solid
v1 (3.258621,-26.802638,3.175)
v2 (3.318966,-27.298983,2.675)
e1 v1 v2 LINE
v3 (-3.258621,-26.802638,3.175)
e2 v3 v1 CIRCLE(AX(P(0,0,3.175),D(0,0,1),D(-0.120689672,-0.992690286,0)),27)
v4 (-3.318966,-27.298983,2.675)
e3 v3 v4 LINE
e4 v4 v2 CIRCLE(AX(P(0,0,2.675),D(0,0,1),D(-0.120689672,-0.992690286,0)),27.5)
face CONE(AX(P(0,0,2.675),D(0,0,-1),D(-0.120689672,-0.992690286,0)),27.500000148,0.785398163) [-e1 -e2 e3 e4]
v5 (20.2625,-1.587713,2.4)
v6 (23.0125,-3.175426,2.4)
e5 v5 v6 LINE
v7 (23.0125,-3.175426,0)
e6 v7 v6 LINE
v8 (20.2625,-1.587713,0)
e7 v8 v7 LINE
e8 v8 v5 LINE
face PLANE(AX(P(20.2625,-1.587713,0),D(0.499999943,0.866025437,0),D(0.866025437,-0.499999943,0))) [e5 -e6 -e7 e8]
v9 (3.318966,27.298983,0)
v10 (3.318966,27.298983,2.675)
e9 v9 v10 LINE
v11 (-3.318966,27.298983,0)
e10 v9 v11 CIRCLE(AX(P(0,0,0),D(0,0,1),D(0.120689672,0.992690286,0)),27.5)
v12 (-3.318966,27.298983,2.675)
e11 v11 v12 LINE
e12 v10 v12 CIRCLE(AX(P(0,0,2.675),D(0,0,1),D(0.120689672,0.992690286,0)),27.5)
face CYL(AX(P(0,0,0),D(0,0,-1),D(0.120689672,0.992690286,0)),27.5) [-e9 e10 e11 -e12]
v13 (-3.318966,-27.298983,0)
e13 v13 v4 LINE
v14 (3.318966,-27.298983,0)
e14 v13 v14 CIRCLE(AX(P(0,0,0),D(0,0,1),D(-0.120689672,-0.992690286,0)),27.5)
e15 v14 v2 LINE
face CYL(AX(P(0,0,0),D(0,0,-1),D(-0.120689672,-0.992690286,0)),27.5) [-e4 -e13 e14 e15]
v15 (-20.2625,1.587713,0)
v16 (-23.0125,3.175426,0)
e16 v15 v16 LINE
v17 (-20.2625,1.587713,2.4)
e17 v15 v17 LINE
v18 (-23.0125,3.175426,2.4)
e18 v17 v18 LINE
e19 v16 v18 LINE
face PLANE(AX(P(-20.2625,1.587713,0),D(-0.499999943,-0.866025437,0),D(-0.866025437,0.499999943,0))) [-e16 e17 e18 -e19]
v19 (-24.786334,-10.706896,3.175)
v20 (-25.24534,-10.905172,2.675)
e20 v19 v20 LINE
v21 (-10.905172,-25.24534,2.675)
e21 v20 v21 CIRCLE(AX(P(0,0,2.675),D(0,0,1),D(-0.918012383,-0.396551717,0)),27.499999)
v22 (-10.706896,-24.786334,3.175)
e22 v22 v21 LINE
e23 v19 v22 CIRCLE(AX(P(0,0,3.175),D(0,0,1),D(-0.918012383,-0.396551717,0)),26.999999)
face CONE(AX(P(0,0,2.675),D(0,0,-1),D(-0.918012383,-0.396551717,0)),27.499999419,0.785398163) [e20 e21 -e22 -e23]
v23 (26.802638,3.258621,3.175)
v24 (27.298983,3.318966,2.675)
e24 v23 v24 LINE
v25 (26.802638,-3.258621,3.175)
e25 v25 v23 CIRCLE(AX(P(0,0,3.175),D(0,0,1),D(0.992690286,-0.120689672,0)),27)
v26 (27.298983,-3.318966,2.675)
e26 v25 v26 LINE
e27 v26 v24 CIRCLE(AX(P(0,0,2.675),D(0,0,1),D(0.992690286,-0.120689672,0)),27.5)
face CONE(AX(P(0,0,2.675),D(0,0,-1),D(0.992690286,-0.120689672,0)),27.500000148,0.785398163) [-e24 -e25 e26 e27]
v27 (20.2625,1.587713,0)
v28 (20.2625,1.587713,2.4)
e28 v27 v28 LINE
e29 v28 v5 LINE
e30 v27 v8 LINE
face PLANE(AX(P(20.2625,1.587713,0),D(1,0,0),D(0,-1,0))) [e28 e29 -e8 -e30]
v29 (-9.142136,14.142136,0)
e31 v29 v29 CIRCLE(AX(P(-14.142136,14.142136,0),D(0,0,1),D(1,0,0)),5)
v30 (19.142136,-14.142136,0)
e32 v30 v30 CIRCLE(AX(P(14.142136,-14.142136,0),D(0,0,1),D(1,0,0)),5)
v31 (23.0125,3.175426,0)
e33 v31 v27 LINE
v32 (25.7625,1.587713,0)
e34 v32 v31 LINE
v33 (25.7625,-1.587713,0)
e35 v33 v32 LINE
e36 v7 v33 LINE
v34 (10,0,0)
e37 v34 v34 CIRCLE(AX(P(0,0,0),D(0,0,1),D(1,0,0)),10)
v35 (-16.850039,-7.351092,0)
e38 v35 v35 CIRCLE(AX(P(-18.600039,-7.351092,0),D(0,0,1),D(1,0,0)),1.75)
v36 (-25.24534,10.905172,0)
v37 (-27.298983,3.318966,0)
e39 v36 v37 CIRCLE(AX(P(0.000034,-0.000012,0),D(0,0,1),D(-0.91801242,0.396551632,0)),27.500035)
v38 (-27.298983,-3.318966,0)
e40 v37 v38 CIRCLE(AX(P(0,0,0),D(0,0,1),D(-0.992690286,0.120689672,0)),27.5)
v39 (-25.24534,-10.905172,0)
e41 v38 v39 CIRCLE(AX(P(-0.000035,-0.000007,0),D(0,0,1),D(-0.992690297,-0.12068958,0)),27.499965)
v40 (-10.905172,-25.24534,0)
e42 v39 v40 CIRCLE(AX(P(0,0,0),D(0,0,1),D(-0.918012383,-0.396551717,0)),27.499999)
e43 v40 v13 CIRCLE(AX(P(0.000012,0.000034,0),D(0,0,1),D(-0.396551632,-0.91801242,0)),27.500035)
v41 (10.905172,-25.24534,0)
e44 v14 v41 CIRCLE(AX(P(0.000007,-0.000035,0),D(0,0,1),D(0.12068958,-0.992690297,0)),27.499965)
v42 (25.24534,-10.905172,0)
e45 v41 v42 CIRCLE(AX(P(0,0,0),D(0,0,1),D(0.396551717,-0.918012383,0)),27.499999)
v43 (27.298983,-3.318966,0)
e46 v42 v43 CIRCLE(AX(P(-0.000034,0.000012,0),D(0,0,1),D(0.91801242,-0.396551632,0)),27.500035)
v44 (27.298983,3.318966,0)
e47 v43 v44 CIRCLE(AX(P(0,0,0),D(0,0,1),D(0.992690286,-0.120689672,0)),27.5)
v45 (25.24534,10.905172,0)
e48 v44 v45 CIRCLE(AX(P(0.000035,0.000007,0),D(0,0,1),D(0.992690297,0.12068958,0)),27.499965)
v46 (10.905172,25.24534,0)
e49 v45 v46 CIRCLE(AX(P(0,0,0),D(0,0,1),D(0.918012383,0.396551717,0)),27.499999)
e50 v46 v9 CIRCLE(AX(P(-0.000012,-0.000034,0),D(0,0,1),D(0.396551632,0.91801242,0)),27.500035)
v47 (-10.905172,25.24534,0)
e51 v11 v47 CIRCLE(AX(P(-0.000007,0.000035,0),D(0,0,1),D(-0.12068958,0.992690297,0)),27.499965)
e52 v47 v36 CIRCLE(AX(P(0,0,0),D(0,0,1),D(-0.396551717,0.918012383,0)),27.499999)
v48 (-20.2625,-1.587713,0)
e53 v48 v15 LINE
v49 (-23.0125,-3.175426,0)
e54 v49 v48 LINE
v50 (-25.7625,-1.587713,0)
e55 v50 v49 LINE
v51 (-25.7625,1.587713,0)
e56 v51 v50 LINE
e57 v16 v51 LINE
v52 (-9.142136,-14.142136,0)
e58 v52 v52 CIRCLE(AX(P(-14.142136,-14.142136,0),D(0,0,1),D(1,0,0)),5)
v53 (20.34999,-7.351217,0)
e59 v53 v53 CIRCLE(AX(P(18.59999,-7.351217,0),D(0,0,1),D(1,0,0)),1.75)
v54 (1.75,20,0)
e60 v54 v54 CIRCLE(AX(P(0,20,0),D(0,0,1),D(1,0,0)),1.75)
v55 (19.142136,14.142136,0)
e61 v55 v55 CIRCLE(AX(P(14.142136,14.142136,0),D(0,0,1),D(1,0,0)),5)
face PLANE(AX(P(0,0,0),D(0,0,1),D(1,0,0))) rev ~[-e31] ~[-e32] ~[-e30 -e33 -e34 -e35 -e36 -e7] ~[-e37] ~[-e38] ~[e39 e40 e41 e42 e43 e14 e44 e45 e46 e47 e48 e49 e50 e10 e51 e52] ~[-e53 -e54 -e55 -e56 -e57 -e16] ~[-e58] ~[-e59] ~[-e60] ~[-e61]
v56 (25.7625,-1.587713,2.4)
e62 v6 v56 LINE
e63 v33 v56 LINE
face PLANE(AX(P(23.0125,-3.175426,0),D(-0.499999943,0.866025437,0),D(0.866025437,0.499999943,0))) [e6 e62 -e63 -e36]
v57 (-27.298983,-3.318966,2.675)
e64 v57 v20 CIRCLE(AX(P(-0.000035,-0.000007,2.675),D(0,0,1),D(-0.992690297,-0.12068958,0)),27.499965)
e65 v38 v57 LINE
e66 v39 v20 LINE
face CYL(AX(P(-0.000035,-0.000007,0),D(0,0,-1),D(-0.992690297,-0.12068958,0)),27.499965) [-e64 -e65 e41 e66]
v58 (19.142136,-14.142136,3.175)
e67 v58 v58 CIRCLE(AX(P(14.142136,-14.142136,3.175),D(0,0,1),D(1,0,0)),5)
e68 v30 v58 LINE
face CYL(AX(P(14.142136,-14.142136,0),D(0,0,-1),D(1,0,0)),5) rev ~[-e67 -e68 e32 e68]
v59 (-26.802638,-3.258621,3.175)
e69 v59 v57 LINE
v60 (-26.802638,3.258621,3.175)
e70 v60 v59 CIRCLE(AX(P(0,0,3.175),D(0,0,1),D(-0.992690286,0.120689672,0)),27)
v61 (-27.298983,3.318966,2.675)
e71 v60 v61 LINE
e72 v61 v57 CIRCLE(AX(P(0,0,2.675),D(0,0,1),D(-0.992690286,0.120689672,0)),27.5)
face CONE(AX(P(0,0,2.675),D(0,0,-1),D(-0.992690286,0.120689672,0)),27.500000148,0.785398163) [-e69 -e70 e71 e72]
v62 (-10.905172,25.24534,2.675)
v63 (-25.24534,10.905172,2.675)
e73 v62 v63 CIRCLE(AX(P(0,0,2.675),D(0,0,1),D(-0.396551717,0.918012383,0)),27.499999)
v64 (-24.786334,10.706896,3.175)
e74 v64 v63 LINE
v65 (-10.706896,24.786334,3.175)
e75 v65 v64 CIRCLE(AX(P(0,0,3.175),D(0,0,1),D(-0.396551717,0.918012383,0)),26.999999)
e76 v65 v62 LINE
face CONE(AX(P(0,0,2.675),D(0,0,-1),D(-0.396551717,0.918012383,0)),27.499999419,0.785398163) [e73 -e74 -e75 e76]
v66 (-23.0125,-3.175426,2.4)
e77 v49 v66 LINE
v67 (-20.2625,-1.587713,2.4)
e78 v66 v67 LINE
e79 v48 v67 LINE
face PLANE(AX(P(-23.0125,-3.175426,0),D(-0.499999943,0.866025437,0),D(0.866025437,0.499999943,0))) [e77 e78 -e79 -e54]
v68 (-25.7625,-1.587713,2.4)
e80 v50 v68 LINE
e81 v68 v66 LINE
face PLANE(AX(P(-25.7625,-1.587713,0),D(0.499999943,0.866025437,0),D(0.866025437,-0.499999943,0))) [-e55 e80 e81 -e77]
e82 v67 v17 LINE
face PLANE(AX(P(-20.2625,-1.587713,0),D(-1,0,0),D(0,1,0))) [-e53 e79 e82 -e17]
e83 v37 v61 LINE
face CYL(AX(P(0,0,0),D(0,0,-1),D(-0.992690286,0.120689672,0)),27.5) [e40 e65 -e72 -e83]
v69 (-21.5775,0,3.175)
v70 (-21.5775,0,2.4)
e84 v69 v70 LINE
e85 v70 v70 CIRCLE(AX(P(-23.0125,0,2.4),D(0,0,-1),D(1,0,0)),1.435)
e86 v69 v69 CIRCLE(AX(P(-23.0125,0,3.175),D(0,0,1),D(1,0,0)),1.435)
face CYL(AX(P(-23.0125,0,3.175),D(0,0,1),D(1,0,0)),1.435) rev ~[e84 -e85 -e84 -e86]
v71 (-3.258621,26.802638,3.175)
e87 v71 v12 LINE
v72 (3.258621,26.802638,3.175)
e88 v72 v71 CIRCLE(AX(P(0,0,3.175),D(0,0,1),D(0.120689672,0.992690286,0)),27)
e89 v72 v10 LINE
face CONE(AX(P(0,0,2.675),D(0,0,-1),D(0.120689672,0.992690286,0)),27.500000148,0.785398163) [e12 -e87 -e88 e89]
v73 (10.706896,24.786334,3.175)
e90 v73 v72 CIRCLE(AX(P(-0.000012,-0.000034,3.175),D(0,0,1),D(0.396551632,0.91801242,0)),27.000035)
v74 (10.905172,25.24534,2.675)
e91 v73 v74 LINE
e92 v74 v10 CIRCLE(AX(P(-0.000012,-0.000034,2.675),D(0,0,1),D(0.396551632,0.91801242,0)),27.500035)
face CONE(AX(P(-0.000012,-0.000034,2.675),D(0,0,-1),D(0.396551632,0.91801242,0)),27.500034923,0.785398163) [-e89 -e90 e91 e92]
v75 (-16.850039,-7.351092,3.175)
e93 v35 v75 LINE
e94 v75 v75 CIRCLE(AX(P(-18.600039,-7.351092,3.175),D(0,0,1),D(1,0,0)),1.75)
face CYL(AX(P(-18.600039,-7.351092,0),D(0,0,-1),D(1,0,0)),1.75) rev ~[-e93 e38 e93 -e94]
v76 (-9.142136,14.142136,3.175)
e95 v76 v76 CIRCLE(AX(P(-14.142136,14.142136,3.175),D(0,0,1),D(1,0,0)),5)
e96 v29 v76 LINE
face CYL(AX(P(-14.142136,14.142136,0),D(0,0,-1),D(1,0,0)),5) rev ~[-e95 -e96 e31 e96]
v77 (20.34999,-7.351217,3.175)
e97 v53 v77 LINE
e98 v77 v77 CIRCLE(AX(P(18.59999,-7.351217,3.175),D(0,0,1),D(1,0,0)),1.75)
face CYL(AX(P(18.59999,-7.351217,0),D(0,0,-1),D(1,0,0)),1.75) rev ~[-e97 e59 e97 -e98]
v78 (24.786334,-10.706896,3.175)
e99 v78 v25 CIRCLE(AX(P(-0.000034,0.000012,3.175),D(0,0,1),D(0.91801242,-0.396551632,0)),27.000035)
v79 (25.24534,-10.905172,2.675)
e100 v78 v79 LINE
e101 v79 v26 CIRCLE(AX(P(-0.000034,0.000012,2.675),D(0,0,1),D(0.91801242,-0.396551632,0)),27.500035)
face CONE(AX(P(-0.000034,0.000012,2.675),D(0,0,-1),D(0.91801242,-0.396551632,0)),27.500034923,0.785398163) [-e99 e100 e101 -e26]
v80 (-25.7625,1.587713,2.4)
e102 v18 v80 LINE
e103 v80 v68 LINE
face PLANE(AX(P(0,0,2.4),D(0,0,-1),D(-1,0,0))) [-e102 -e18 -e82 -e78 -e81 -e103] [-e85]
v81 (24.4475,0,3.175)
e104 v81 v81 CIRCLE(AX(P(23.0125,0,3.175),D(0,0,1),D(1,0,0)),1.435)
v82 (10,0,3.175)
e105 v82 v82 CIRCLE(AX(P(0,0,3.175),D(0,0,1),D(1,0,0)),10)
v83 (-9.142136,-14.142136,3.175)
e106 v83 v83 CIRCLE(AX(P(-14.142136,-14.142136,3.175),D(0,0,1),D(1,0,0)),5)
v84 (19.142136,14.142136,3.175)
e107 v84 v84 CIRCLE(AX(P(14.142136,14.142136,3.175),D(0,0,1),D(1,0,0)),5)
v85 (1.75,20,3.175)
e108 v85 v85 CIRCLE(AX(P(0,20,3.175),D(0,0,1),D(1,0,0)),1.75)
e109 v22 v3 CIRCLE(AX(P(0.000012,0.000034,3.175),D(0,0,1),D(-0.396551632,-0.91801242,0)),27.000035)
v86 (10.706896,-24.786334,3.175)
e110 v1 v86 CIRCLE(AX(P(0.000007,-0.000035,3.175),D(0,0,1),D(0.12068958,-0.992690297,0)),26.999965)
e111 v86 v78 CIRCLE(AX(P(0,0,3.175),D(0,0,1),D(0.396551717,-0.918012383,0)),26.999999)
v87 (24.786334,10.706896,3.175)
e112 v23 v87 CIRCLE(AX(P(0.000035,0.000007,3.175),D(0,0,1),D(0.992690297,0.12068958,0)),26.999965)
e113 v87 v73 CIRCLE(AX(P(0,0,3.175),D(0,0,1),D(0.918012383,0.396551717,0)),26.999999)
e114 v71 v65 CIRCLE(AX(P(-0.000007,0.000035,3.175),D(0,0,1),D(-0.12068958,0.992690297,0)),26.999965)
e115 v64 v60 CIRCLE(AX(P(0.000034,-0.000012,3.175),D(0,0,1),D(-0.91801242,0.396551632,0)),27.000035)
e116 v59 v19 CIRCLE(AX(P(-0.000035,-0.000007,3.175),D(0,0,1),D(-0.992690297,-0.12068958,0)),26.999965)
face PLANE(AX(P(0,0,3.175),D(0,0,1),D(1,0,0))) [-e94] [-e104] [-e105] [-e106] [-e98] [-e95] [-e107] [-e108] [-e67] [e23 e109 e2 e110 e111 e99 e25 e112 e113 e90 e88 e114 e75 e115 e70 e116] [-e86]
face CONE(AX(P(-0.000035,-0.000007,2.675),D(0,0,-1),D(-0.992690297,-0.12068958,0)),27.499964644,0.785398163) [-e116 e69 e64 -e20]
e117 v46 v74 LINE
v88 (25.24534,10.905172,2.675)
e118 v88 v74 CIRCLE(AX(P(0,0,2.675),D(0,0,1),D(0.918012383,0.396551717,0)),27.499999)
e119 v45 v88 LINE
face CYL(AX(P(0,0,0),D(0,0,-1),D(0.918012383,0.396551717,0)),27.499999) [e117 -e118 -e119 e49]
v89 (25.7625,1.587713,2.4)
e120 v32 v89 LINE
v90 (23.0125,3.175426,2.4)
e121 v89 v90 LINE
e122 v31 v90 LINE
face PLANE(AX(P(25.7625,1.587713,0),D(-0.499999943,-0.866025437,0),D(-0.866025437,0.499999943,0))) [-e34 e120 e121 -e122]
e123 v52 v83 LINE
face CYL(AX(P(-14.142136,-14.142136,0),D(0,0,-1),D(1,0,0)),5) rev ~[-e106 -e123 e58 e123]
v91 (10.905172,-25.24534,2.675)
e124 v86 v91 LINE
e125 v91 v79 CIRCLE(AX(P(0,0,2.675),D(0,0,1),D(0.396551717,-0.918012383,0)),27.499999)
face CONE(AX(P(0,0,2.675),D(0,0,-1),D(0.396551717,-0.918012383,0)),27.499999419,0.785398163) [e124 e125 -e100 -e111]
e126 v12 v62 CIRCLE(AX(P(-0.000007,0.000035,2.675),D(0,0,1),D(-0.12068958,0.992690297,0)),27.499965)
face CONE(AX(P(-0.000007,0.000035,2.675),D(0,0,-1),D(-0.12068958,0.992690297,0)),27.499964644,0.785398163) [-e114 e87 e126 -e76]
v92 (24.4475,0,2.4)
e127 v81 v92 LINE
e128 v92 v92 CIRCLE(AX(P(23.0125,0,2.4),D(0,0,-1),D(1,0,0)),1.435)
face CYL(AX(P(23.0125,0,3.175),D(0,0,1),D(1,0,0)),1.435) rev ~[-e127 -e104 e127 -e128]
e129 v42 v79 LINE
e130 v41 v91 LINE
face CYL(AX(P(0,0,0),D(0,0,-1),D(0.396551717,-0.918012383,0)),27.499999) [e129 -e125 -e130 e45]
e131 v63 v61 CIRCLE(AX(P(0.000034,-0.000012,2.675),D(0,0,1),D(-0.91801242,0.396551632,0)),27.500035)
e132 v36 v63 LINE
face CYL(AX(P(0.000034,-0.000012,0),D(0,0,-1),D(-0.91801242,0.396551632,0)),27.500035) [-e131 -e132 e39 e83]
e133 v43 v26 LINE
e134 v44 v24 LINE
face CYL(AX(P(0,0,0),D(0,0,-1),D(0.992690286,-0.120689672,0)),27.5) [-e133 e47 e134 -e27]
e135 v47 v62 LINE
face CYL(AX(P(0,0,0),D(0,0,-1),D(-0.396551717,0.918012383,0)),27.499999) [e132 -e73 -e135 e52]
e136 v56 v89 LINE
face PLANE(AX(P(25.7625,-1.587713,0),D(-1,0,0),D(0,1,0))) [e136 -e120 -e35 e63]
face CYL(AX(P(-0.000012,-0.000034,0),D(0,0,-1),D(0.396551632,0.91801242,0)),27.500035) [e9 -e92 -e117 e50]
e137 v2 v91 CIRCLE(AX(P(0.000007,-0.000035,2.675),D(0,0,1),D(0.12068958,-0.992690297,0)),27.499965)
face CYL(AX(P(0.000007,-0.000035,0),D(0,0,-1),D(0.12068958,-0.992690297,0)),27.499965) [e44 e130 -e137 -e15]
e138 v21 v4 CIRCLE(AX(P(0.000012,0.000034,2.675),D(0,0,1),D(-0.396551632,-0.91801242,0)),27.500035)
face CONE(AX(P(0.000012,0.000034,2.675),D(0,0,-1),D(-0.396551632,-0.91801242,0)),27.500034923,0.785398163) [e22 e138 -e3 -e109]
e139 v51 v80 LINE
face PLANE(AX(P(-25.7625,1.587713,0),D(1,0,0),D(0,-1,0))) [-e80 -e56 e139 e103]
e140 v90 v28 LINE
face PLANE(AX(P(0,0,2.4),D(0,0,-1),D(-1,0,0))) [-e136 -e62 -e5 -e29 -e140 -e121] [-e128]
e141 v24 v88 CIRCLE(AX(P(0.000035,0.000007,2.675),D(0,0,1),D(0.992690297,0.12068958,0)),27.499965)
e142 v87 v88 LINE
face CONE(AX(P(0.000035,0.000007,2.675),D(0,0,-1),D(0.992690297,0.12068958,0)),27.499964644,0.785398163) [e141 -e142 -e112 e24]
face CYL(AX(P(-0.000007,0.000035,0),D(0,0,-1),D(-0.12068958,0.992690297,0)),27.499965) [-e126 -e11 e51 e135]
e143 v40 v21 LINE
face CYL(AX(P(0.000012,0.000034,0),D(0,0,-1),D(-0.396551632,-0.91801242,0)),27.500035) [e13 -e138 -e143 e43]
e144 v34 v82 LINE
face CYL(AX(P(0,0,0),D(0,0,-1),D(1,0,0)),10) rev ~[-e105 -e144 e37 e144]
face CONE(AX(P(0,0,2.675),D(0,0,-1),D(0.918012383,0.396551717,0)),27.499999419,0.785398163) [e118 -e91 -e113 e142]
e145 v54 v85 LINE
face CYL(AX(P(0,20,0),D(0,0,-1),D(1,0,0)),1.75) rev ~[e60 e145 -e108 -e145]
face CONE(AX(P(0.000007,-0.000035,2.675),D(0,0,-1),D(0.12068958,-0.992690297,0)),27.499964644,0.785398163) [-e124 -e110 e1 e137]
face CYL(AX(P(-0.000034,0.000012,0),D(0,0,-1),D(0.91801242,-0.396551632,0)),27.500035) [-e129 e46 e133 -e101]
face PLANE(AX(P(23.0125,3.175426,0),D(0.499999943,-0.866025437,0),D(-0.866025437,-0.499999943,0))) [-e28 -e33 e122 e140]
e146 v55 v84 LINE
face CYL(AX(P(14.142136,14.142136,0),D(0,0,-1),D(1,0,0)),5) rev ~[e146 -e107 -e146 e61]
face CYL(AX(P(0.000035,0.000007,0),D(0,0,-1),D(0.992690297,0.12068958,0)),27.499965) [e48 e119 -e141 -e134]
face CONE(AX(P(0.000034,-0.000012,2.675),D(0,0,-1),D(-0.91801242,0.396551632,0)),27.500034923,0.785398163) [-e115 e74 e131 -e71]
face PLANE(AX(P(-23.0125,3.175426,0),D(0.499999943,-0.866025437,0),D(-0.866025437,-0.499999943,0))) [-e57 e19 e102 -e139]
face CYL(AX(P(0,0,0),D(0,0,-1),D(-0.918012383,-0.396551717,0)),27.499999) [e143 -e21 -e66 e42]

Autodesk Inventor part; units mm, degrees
ref_plane "YZ Plane" through (0, 0, 0) normal (1, 0, 0) x (0, 1, 0)
ref_plane "XZ Plane" through (0, 0, 0) normal (0, 1, 0) x (-1, 0, 0)
ref_plane "XY Plane" through (0, 0, 0) normal (0, 0, 1) x (1, 0, 0)
sketch "Sketch1" plane through (0, 0, 0) normal (0, 0, 1) x (1, 0, 0)
  circle A0 centre (-43.950789, -25.375) radius 1.8
  circle A1 centre (0, -50.75) radius 1.8
  circle A2 centre (43.950789, -25.375) radius 1.8
  circle A3 centre (43.950789, 25.375) radius 1.8
  circle A4 centre (0, 50.75) radius 1.8
  circle A5 centre (-43.950789, 25.375) radius 1.8
  circle A6 centre (0, 0) radius 55
  circle A7 centre (0, 0) radius 10
  line L0 (-5, -45.365185) -> (-5, -28.788018)
  arc A8 (-3.318966, -27.298983) -> (-5, -28.788018) centre (-3.5, -28.788018) ccw
  arc A9 (-3.318966, -27.298983) -> (3.318966, -27.298983) centre (0, 0) ccw
  arc A10 (5, -28.788018) -> (3.318966, -27.298983) centre (3.5, -28.788018) ccw
  line L1 (5, -28.788018) -> (5, -45.365185)
  arc A11 (3.615385, -46.86074) -> (5, -45.365185) centre (3.5, -45.365185) ccw
  arc A12 (-3.615385, -46.86074) -> (3.615385, -46.86074) centre (0, 0) ccw
  arc A13 (-5, -45.365185) -> (-3.615385, -46.86074) centre (-3.5, -45.365185) ccw
  arc A14 (3.615385, 46.86074) -> (-3.615385, 46.86074) centre (0, 0) ccw
  arc A15 (5, 45.365185) -> (3.615385, 46.86074) centre (3.5, 45.365185) ccw
  line L2 (5, 45.365185) -> (5, 28.788018)
  arc A16 (3.318966, 27.298983) -> (5, 28.788018) centre (3.5, 28.788018) ccw
  arc A17 (3.318966, 27.298983) -> (-3.318966, 27.298983) centre (0, 0) ccw
  arc A18 (-5, 28.788018) -> (-3.318966, 27.298983) centre (-3.5, 28.788018) ccw
  line L3 (-5, 28.788018) -> (-5, 45.365185)
  arc A19 (-3.615385, 46.86074) -> (-5, 45.365185) centre (-3.5, 45.365185) ccw
  circle A20 centre (25.375, -43.950789) radius 3.75
  arc A21 (11.879121, -45.47402) -> (23.5, -40.703194) centre (0, 0) ccw
  arc A22 (10, -44.022721) -> (11.879121, -45.47402) centre (11.5, -44.022721) ccw
  line L4 (10, -44.022721) -> (10, -26.622359)
  arc A23 (10.905172, -25.24534) -> (10, -26.622359) centre (11.5, -26.622359) ccw
  arc A24 (10.905172, -25.24534) -> (25.24534, -10.905172) centre (0, 0) ccw
  arc A25 (26.622359, -10) -> (25.24534, -10.905172) centre (26.622359, -11.5) ccw
  line L5 (26.622359, -10) -> (44.022721, -10)
  arc A26 (45.47402, -11.879121) -> (44.022721, -10) centre (44.022721, -11.5) ccw
  arc A27 (23.5, -40.703194) -> (45.47402, -11.879121) centre (0, 0) ccw
  circle A28 centre (-50.75, 0) radius 3.75
  arc A29 (-46.86074, 3.615385) -> (-47, 0) centre (0, 0) ccw
  arc A30 (-45.365185, 5) -> (-46.86074, 3.615385) centre (-45.365185, 3.5) ccw
  line L6 (-45.365185, 5) -> (-28.788018, 5)
  arc A31 (-27.298983, 3.318966) -> (-28.788018, 5) centre (-28.788018, 3.5) ccw
  arc A32 (-27.298983, 3.318966) -> (-27.298983, -3.318966) centre (0, 0) ccw
  arc A33 (-28.788018, -5) -> (-27.298983, -3.318966) centre (-28.788018, -3.5) ccw
  line L7 (-28.788018, -5) -> (-45.365185, -5)
  arc A34 (-46.86074, -3.615385) -> (-45.365185, -5) centre (-45.365185, -3.5) ccw
  arc A35 (-47, 0) -> (-46.86074, -3.615385) centre (0, 0) ccw
  circle A36 centre (25.375, 43.950789) radius 3.75
  arc A37 (45.47402, 11.879121) -> (23.5, 40.703194) centre (0, 0) ccw
  arc A38 (44.022721, 10) -> (45.47402, 11.879121) centre (44.022721, 11.5) ccw
  line L8 (44.022721, 10) -> (26.622359, 10)
  arc A39 (25.24534, 10.905172) -> (26.622359, 10) centre (26.622359, 11.5) ccw
  arc A40 (25.24534, 10.905172) -> (10.905172, 25.24534) centre (0, 0) ccw
  arc A41 (10, 26.622359) -> (10.905172, 25.24534) centre (11.5, 26.622359) ccw
  line L9 (10, 26.622359) -> (10, 44.022721)
  arc A42 (11.879121, 45.47402) -> (10, 44.022721) centre (11.5, 44.022721) ccw
  arc A43 (23.5, 40.703194) -> (11.879121, 45.47402) centre (0, 0) ccw
  circle A44 centre (-25.375, 43.950789) radius 3.75
  arc A45 (-11.879121, 45.47402) -> (-23.5, 40.703194) centre (0, 0) ccw
  arc A46 (-10, 44.022721) -> (-11.879121, 45.47402) centre (-11.5, 44.022721) ccw
  line L10 (-10, 44.022721) -> (-10, 26.622359)
  arc A47 (-10.905172, 25.24534) -> (-10, 26.622359) centre (-11.5, 26.622359) ccw
  arc A48 (-10.905172, 25.24534) -> (-25.24534, 10.905172) centre (0, 0) ccw
  arc A49 (-26.622359, 10) -> (-25.24534, 10.905172) centre (-26.622359, 11.5) ccw
  line L11 (-26.622359, 10) -> (-44.022721, 10)
  arc A50 (-45.47402, 11.879121) -> (-44.022721, 10) centre (-44.022721, 11.5) ccw
  arc A51 (-23.5, 40.703194) -> (-45.47402, 11.879121) centre (0, 0) ccw
  circle A52 centre (-25.375, -43.950789) radius 3.75
  arc A53 (-45.47402, -11.879121) -> (-23.5, -40.703194) centre (0, 0) ccw
  arc A54 (-44.022721, -10) -> (-45.47402, -11.879121) centre (-44.022721, -11.5) ccw
  line L12 (-44.022721, -10) -> (-26.622359, -10)
  arc A55 (-25.24534, -10.905172) -> (-26.622359, -10) centre (-26.622359, -11.5) ccw
  arc A56 (-25.24534, -10.905172) -> (-10.905172, -25.24534) centre (0, 0) ccw
  arc A57 (-10, -26.622359) -> (-10.905172, -25.24534) centre (-11.5, -26.622359) ccw
  line L13 (-10, -26.622359) -> (-10, -44.022721)
  arc A58 (-11.879121, -45.47402) -> (-10, -44.022721) centre (-11.5, -44.022721) ccw
  arc A59 (-23.5, -40.703194) -> (-11.879121, -45.47402) centre (0, 0) ccw
  circle A60 centre (50.75, 0) radius 3.75
  arc A61 (46.86074, -3.615385) -> (47, 0) centre (0, 0) ccw
  arc A62 (45.365185, -5) -> (46.86074, -3.615385) centre (45.365185, -3.5) ccw
  line L14 (45.365185, -5) -> (28.788018, -5)
  arc A63 (27.298983, -3.318966) -> (28.788018, -5) centre (28.788018, -3.5) ccw
  arc A64 (27.298983, -3.318966) -> (27.298983, 3.318966) centre (0, 0) ccw
  arc A65 (28.788018, 5) -> (27.298983, 3.318966) centre (28.788018, 3.5) ccw
  line L15 (28.788018, 5) -> (45.365185, 5)
  arc A66 (46.86074, 3.615385) -> (45.365185, 5) centre (45.365185, 3.5) ccw
  arc A67 (47, 0) -> (46.86074, 3.615385) centre (0, 0) ccw
  circle A68 centre (-14.142136, -14.142136) radius 5
  circle A69 centre (14.142136, 14.142136) radius 5
  circle A70 centre (-14.142136, 14.142136) radius 5
  circle A71 centre (14.142136, -14.142136) radius 5
  circle A72 centre (0, 0) radius 27.5
  circle A73 centre (0, 20) radius 1.75
  circle A74 centre (-18.600039, -7.351092) radius 1.75
  circle A75 centre (18.59999, -7.351217) radius 1.75
  point P0 (0, 0)
  point P1 (-27.298983, -3.318966)
  point P2 (-25.24534, -10.905172)
  point P3 (-10.905172, -25.24534)
  point P4 (3.318966, -27.298983)
  point P5 (25.24534, -10.905172)
  point P6 (27.298983, 3.318966)
  point P7 (25.24534, 10.905172)
  point P8 (10.905172, 25.24534)
  point P9 (-3.318966, 27.298983)
  point P10 (-25.24534, 10.905172)
sketch "Sketch1 outline for Extrusion1" plane through (0, 0, 0) normal (0, 0, 1) x (1, 0, 0)
  arc A0 (-27.298983, -3.318966) -> (-25.24534, -10.905172) centre (0, 0) ccw
  arc A1 (-27.298983, 3.318966) -> (-27.298983, -3.318966) centre (0, 0) ccw
  arc A2 (-25.24534, -10.905172) -> (-10.905172, -25.24534) centre (0, 0) ccw
  arc A3 (-25.24534, 10.905172) -> (-27.298983, 3.318966) centre (0, 0) ccw
  arc A4 (-10.905172, -25.24534) -> (-3.318966, -27.298983) centre (0, 0) ccw
  arc A5 (-10.905172, 25.24534) -> (-25.24534, 10.905172) centre (0, 0) ccw
  arc A6 (-3.318966, -27.298983) -> (3.318966, -27.298983) centre (0, 0) ccw
  arc A7 (-3.318966, 27.298983) -> (-10.905172, 25.24534) centre (0, 0) ccw
  arc A8 (3.318966, -27.298983) -> (10.905172, -25.24534) centre (0, 0) ccw
  arc A9 (3.318966, 27.298983) -> (-3.318966, 27.298983) centre (0, 0) ccw
  arc A10 (10.905172, -25.24534) -> (25.24534, -10.905172) centre (0, 0) ccw
  arc A11 (10.905172, 25.24534) -> (3.318966, 27.298983) centre (0, 0) ccw
  arc A12 (25.24534, -10.905172) -> (27.298983, -3.318966) centre (0, 0) ccw
  arc A13 (25.24534, 10.905172) -> (10.905172, 25.24534) centre (0, 0) ccw
  arc A14 (27.298983, -3.318966) -> (27.298983, 3.318966) centre (0, 0) ccw
  arc A15 (27.298983, 3.318966) -> (25.24534, 10.905172) centre (0, 0) ccw
  circle A16 centre (-14.142136, -14.142136) radius 5
  circle A17 centre (-18.600039, -7.351092) radius 1.75
  circle A18 centre (14.142136, -14.142136) radius 5
  circle A19 centre (0, 0) radius 10
  circle A20 centre (18.59999, -7.351217) radius 1.75
  circle A21 centre (-14.142136, 14.142136) radius 5
  circle A22 centre (0, 20) radius 1.75
  circle A23 centre (14.142136, 14.142136) radius 5
extrude "Extrusion1" add sketch "Sketch1 outline for Extrusion1" along normal blind 3.175
sketch "Sketch2" plane through (0, 0, 3.175) normal (0, 0, 1) x (1, 0, 0)
  circle A0 centre (-23.0125, 0) radius 1.435 projected
  circle A1 centre (23.0125, 0) radius 1.435 projected
  point P0 (0, 0)
extrude "Extrusion2" cut sketch "Sketch2" against normal blind 3.175
sketch "Sketch3" plane through (0, 0, 0) normal (0, 0, -1) x (-1, 0, 0)
  circle A0 centre (-23.0125, 0) radius 1.435
  circle A1 centre (23.0125, 0) radius 1.435
  line L0 (-23.0125, 3.175426) -> (-20.2625, 1.587713)
  line L1 (-20.2625, 1.587713) -> (-20.2625, -1.587713)
  line L2 (-20.2625, -1.587713) -> (-23.0125, -3.175426)
  line L3 (-23.0125, -3.175426) -> (-25.7625, -1.587713)
  line L4 (-25.7625, -1.587713) -> (-25.7625, 1.587713)
  line L5 (-25.7625, 1.587713) -> (-23.0125, 3.175426)
  circle A2 centre (23.0125, 0) radius 1.435
  line L6 (23.0125, 3.175426) -> (25.7625, 1.587713)
  line L7 (25.7625, 1.587713) -> (25.7625, -1.587713)
  line L8 (25.7625, -1.587713) -> (23.0125, -3.175426)
  line L9 (23.0125, -3.175426) -> (20.2625, -1.587713)
  line L10 (20.2625, -1.587713) -> (20.2625, 1.587713)
  line L11 (20.2625, 1.587713) -> (23.0125, 3.175426)
  point P0 (0, 0)
  dimension "d4" = 5.5
  dimension "d5" = 5.5
extrude "Extrusion3" cut sketch "Sketch3" against normal blind 2.4
chamfer "Chamfer1" distance 0.5 angle 45 1 edges at (-25.2453, -10.9052, 3.175)
properties part number "AMT102Mount"
